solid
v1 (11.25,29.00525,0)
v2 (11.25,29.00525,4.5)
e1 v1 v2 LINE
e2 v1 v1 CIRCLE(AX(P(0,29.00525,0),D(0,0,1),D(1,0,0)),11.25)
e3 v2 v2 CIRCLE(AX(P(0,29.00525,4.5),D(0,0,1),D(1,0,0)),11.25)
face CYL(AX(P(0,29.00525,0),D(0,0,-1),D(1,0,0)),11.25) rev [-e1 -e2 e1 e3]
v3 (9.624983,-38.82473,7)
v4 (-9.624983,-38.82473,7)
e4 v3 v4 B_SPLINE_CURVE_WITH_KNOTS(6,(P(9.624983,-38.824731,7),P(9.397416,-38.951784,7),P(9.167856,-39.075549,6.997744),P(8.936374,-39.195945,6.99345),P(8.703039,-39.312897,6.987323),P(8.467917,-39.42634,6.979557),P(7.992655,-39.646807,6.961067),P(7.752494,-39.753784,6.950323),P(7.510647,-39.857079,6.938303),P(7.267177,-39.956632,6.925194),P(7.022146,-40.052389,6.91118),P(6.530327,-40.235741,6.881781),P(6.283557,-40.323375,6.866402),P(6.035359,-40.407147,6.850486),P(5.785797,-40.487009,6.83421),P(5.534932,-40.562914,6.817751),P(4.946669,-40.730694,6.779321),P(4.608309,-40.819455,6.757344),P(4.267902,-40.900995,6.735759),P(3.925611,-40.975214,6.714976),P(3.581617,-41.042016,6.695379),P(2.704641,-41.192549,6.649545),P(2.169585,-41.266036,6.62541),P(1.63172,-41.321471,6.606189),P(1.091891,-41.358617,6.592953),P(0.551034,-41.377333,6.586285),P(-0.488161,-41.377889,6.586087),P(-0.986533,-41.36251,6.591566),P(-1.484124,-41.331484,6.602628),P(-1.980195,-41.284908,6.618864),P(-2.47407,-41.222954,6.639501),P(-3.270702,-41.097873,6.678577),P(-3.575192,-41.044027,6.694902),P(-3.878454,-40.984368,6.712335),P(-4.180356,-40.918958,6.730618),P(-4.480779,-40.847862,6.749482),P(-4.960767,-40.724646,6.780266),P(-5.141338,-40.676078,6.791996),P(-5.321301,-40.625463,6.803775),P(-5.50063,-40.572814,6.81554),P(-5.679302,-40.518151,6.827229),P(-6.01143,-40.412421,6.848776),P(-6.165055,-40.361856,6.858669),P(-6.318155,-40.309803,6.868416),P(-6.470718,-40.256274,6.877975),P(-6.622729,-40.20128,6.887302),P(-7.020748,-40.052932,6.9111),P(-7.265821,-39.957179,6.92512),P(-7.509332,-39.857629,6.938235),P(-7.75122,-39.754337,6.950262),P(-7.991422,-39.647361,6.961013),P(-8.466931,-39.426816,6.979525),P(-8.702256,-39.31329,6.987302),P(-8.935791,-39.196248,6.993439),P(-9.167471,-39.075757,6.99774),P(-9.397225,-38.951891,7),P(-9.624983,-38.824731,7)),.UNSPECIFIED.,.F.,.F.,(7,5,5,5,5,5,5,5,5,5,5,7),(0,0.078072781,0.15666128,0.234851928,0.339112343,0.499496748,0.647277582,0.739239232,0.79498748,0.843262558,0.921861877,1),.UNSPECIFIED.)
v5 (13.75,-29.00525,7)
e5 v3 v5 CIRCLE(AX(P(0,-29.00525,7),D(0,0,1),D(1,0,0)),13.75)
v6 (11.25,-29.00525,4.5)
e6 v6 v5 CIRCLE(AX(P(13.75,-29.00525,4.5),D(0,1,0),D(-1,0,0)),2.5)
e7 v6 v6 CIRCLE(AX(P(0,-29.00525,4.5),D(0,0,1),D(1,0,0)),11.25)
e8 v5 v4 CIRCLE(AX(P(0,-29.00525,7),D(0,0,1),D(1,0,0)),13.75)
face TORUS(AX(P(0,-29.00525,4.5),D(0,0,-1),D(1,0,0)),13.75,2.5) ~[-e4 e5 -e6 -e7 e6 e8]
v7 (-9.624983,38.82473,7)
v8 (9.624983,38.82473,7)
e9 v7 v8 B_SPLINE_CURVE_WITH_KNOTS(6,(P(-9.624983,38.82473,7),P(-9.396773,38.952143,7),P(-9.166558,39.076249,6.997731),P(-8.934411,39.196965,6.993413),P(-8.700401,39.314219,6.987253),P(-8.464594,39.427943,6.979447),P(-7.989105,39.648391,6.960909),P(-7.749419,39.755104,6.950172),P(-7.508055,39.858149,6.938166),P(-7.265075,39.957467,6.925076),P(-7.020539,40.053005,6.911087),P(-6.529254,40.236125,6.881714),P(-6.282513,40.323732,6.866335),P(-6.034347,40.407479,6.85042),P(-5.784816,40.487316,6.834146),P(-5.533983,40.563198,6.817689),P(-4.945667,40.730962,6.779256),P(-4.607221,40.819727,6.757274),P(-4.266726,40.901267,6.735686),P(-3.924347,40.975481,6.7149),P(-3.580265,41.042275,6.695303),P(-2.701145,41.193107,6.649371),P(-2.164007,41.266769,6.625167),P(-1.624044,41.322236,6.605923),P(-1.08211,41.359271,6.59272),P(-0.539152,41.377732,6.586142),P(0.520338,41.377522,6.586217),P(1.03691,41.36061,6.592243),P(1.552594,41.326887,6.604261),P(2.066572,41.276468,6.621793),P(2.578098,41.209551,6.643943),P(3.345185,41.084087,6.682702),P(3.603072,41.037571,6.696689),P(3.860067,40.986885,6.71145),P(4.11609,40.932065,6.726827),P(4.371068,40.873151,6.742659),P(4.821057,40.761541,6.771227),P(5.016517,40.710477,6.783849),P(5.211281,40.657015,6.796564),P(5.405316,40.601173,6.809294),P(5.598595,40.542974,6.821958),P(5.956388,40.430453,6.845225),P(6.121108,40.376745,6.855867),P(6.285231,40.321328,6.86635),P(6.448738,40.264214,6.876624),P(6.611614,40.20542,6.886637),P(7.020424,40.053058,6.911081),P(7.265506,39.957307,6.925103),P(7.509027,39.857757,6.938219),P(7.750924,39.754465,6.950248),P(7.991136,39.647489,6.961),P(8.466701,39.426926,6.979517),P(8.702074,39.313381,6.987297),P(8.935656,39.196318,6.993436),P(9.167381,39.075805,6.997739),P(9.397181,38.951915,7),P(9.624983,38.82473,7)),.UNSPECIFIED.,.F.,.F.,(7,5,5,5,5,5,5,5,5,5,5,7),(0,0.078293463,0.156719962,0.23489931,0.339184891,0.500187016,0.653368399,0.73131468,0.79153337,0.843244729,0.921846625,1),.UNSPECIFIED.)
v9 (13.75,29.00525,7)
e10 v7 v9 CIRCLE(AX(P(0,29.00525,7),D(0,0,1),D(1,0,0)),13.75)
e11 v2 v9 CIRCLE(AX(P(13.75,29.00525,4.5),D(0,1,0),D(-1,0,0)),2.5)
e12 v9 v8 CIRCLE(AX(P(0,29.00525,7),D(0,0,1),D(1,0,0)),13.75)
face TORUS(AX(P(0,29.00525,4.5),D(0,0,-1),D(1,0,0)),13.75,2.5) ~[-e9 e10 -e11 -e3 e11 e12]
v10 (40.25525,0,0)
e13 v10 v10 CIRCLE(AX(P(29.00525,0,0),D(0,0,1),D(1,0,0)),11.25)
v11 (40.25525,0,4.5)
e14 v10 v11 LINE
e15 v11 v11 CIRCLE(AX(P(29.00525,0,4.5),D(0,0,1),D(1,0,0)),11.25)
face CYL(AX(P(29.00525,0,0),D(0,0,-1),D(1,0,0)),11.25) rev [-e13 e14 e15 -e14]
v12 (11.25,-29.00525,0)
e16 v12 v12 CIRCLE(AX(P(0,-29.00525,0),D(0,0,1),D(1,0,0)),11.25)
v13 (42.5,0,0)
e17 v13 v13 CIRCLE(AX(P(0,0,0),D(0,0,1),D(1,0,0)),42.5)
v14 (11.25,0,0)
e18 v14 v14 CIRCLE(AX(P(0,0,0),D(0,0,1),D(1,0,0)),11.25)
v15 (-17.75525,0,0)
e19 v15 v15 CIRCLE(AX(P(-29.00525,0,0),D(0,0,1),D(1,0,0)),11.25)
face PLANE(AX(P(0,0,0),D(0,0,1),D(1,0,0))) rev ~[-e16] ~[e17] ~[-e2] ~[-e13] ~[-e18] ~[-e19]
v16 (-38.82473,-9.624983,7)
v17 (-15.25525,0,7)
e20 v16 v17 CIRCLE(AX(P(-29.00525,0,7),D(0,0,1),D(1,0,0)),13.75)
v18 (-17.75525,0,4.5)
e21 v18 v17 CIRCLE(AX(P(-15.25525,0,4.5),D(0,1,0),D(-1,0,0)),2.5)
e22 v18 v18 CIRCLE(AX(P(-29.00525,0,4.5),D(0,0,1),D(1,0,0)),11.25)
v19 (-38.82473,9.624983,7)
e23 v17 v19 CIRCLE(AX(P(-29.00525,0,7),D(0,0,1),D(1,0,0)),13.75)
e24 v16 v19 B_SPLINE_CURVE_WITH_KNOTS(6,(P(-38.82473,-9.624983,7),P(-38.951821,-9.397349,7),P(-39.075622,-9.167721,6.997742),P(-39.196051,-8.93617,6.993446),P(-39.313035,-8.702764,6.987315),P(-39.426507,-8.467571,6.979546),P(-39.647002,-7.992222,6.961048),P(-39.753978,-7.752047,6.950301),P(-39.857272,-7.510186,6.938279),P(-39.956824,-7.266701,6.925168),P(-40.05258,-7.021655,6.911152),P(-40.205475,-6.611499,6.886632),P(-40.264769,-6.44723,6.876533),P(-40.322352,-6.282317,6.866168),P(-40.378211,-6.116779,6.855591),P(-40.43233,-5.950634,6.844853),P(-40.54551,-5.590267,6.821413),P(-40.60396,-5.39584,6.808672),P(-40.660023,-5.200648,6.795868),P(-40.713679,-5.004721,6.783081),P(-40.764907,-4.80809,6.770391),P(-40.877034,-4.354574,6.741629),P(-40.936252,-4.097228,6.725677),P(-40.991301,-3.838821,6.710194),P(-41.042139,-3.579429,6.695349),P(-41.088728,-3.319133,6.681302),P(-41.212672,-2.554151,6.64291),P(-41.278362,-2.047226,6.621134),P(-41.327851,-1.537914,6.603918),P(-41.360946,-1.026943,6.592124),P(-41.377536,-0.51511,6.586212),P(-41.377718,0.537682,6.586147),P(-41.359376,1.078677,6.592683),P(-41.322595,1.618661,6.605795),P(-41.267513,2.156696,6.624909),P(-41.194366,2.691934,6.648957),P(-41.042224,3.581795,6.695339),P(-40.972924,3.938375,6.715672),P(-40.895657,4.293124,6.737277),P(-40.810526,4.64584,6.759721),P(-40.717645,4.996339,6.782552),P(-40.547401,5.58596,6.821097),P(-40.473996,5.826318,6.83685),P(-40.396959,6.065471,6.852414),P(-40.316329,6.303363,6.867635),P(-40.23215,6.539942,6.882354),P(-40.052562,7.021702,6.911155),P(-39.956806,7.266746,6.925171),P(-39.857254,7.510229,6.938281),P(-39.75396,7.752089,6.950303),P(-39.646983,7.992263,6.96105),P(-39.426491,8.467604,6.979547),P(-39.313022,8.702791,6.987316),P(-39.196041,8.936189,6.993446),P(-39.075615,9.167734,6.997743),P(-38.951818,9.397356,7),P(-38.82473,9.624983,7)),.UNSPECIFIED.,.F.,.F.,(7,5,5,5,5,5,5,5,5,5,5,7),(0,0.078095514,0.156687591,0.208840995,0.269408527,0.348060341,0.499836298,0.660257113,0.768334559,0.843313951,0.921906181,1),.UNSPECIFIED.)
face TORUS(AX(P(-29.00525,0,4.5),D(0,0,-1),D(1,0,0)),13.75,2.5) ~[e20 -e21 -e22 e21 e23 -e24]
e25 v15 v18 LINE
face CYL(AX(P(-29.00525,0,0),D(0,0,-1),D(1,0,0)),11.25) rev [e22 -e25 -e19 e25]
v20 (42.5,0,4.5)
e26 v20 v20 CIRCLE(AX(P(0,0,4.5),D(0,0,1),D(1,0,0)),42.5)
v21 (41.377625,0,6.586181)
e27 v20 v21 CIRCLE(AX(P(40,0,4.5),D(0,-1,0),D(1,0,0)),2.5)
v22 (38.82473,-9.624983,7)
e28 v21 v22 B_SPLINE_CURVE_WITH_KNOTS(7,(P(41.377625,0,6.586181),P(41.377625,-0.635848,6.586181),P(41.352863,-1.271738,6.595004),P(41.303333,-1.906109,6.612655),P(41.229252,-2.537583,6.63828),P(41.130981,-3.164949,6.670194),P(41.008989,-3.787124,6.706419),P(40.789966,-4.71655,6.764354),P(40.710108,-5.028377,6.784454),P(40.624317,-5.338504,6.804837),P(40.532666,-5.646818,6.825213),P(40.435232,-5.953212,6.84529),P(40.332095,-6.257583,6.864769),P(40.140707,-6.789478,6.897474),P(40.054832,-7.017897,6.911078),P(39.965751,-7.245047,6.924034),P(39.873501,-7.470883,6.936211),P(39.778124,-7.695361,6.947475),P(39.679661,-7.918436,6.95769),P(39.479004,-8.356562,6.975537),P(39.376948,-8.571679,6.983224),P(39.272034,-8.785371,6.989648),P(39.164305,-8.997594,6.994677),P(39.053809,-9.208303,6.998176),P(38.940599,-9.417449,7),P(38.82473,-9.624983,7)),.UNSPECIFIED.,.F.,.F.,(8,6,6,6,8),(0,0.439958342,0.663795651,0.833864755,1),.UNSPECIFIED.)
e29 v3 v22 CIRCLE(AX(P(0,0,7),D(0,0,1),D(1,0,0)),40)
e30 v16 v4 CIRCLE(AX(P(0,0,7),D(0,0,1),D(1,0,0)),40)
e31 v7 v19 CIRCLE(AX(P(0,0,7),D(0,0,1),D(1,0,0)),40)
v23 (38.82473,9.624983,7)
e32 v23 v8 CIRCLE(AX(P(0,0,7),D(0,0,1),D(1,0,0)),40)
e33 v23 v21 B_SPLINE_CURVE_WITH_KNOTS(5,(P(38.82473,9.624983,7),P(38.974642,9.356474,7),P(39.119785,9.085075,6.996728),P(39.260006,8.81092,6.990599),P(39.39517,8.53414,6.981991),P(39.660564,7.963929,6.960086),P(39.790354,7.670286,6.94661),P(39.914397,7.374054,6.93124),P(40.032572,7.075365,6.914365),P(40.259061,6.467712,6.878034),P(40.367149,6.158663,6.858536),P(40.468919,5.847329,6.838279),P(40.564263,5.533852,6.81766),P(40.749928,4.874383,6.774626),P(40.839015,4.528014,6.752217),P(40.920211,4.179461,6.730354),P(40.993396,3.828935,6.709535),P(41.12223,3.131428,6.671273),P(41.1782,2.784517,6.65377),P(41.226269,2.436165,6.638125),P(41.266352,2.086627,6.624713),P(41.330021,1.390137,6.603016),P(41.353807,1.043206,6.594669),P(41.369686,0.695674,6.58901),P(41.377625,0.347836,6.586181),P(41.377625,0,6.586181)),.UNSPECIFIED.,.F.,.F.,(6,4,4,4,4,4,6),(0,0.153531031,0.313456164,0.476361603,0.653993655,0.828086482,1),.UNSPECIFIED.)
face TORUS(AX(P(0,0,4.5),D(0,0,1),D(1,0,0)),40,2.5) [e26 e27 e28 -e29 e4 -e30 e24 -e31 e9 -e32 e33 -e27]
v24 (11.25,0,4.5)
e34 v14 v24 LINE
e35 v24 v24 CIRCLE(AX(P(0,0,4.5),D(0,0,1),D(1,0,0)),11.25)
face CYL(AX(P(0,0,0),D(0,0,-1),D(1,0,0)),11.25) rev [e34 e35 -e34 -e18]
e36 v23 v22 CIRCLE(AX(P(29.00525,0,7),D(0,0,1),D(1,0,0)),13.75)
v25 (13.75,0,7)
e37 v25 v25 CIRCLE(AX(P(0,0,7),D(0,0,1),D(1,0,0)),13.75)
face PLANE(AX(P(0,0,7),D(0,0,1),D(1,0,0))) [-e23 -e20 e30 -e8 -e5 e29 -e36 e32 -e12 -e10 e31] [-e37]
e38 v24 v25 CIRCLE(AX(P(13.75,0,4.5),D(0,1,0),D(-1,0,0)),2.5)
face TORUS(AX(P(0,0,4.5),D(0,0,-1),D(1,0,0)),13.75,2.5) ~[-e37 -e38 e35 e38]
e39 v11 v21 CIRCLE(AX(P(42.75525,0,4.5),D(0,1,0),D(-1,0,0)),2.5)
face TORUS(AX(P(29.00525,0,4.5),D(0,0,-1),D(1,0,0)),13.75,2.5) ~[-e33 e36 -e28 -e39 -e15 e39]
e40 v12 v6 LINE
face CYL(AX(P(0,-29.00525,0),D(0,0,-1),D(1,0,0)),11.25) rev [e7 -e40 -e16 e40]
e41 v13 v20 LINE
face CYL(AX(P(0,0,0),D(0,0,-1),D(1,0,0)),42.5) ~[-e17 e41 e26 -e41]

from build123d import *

# Parameters (mm, degrees)
F0_R     = 42.5
F0_R_2   = 11.25
F1_DEPTH = 7


# Not quite as in the source:
# - a fillet or chamfer that OpenCascade refuses, or shapes differently, is made with other operations: its cross-section is extruded or revolved along the edge and cut away or added


with BuildPart() as f1:
    # F0 (on Top) → F1 (new body)
    with BuildSketch(Plane.XY):
        Circle(F0_R)
        with Locations((0, -29.0052499622)):
            Circle(F0_R_2, mode=Mode.SUBTRACT)
        with Locations((-29.0052499622, 0)):
            Circle(F0_R_2, mode=Mode.SUBTRACT)
        Circle(F0_R_2, mode=Mode.SUBTRACT)
        with Locations((29.0052499622, 0)):
            Circle(F0_R_2, mode=Mode.SUBTRACT)
        with Locations((0, 29.0052499622)):
            Circle(F0_R_2, mode=Mode.SUBTRACT)
    extrude(amount=F1_DEPTH)

    # F2: fillet of radius 2.5 on 6 edges, made by hand

    # F2_s1 → F2_t2 (revolve, cut)
    with BuildSketch(Plane.XZ):
        with BuildLine():
            ThreePointArc((42.5, 4.5), (41.767766953, 6.267766953), (40, 7))
            Line((40, 7), (42.5, 7))
            Line((42.5, 7), (42.5, 4.5))
        make_face()
    revolve(axis=Axis((0, 0, 7), (0, 0, 1)), mode=Mode.SUBTRACT)

    # F2_s3 → F2_t4 (revolve, cut)
    with BuildSketch(Plane.XZ.offset(29.0052499622)):
        with BuildLine():
            ThreePointArc((11.25, 4.5), (11.982233047, 6.267766953), (13.75, 7))
            Line((13.75, 7), (11.25, 7))
            Line((11.25, 7), (11.25, 4.5))
        make_face()
    revolve(axis=Axis((0, -29.0052499622, 7), (0, 0, 1)), mode=Mode.SUBTRACT)

    # F2_s5 → F2_t6 (revolve, cut)
    with BuildSketch(Plane.XZ):
        with BuildLine():
            ThreePointArc((-17.7552499622, 4.5), (-17.0230169152, 6.267766953), (-15.2552499622, 7))
            Line((-15.2552499622, 7), (-17.7552499622, 7))
            Line((-17.7552499622, 7), (-17.7552499622, 4.5))
        make_face()
    revolve(axis=Axis((-29.0052499622, 0, 7), (0, 0, 1)), mode=Mode.SUBTRACT)

    # F2_s7 → F2_t8 (revolve, cut)
    with BuildSketch(Plane.XZ):
        with BuildLine():
            ThreePointArc((11.25, 4.5), (11.982233047, 6.267766953), (13.75, 7))
            Line((13.75, 7), (11.25, 7))
            Line((11.25, 7), (11.25, 4.5))
        make_face()
    revolve(axis=Axis((0, 0, 7), (0, 0, 1)), mode=Mode.SUBTRACT)

    # F2_s9 → F2_t10 (revolve, cut)
    with BuildSketch(Plane.XZ):
        with BuildLine():
            ThreePointArc((40.2552499622, 4.5), (40.9874830092, 6.267766953), (42.7552499622, 7))
            Line((42.7552499622, 7), (40.2552499622, 7))
            Line((40.2552499622, 7), (40.2552499622, 4.5))
        make_face()
    revolve(axis=Axis((29.0052499622, 0, 7), (0, 0, 1)), mode=Mode.SUBTRACT)

    # F2_s11 → F2_t12 (revolve, cut)
    with BuildSketch(Plane.XZ.offset(-29.0052499622)):
        with BuildLine():
            ThreePointArc((11.25, 4.5), (11.982233047, 6.267766953), (13.75, 7))
            Line((13.75, 7), (11.25, 7))
            Line((11.25, 7), (11.25, 4.5))
        make_face()
    revolve(axis=Axis((0, 29.0052499622, 7), (0, 0, 1)), mode=Mode.SUBTRACT)


solid = f1.part
